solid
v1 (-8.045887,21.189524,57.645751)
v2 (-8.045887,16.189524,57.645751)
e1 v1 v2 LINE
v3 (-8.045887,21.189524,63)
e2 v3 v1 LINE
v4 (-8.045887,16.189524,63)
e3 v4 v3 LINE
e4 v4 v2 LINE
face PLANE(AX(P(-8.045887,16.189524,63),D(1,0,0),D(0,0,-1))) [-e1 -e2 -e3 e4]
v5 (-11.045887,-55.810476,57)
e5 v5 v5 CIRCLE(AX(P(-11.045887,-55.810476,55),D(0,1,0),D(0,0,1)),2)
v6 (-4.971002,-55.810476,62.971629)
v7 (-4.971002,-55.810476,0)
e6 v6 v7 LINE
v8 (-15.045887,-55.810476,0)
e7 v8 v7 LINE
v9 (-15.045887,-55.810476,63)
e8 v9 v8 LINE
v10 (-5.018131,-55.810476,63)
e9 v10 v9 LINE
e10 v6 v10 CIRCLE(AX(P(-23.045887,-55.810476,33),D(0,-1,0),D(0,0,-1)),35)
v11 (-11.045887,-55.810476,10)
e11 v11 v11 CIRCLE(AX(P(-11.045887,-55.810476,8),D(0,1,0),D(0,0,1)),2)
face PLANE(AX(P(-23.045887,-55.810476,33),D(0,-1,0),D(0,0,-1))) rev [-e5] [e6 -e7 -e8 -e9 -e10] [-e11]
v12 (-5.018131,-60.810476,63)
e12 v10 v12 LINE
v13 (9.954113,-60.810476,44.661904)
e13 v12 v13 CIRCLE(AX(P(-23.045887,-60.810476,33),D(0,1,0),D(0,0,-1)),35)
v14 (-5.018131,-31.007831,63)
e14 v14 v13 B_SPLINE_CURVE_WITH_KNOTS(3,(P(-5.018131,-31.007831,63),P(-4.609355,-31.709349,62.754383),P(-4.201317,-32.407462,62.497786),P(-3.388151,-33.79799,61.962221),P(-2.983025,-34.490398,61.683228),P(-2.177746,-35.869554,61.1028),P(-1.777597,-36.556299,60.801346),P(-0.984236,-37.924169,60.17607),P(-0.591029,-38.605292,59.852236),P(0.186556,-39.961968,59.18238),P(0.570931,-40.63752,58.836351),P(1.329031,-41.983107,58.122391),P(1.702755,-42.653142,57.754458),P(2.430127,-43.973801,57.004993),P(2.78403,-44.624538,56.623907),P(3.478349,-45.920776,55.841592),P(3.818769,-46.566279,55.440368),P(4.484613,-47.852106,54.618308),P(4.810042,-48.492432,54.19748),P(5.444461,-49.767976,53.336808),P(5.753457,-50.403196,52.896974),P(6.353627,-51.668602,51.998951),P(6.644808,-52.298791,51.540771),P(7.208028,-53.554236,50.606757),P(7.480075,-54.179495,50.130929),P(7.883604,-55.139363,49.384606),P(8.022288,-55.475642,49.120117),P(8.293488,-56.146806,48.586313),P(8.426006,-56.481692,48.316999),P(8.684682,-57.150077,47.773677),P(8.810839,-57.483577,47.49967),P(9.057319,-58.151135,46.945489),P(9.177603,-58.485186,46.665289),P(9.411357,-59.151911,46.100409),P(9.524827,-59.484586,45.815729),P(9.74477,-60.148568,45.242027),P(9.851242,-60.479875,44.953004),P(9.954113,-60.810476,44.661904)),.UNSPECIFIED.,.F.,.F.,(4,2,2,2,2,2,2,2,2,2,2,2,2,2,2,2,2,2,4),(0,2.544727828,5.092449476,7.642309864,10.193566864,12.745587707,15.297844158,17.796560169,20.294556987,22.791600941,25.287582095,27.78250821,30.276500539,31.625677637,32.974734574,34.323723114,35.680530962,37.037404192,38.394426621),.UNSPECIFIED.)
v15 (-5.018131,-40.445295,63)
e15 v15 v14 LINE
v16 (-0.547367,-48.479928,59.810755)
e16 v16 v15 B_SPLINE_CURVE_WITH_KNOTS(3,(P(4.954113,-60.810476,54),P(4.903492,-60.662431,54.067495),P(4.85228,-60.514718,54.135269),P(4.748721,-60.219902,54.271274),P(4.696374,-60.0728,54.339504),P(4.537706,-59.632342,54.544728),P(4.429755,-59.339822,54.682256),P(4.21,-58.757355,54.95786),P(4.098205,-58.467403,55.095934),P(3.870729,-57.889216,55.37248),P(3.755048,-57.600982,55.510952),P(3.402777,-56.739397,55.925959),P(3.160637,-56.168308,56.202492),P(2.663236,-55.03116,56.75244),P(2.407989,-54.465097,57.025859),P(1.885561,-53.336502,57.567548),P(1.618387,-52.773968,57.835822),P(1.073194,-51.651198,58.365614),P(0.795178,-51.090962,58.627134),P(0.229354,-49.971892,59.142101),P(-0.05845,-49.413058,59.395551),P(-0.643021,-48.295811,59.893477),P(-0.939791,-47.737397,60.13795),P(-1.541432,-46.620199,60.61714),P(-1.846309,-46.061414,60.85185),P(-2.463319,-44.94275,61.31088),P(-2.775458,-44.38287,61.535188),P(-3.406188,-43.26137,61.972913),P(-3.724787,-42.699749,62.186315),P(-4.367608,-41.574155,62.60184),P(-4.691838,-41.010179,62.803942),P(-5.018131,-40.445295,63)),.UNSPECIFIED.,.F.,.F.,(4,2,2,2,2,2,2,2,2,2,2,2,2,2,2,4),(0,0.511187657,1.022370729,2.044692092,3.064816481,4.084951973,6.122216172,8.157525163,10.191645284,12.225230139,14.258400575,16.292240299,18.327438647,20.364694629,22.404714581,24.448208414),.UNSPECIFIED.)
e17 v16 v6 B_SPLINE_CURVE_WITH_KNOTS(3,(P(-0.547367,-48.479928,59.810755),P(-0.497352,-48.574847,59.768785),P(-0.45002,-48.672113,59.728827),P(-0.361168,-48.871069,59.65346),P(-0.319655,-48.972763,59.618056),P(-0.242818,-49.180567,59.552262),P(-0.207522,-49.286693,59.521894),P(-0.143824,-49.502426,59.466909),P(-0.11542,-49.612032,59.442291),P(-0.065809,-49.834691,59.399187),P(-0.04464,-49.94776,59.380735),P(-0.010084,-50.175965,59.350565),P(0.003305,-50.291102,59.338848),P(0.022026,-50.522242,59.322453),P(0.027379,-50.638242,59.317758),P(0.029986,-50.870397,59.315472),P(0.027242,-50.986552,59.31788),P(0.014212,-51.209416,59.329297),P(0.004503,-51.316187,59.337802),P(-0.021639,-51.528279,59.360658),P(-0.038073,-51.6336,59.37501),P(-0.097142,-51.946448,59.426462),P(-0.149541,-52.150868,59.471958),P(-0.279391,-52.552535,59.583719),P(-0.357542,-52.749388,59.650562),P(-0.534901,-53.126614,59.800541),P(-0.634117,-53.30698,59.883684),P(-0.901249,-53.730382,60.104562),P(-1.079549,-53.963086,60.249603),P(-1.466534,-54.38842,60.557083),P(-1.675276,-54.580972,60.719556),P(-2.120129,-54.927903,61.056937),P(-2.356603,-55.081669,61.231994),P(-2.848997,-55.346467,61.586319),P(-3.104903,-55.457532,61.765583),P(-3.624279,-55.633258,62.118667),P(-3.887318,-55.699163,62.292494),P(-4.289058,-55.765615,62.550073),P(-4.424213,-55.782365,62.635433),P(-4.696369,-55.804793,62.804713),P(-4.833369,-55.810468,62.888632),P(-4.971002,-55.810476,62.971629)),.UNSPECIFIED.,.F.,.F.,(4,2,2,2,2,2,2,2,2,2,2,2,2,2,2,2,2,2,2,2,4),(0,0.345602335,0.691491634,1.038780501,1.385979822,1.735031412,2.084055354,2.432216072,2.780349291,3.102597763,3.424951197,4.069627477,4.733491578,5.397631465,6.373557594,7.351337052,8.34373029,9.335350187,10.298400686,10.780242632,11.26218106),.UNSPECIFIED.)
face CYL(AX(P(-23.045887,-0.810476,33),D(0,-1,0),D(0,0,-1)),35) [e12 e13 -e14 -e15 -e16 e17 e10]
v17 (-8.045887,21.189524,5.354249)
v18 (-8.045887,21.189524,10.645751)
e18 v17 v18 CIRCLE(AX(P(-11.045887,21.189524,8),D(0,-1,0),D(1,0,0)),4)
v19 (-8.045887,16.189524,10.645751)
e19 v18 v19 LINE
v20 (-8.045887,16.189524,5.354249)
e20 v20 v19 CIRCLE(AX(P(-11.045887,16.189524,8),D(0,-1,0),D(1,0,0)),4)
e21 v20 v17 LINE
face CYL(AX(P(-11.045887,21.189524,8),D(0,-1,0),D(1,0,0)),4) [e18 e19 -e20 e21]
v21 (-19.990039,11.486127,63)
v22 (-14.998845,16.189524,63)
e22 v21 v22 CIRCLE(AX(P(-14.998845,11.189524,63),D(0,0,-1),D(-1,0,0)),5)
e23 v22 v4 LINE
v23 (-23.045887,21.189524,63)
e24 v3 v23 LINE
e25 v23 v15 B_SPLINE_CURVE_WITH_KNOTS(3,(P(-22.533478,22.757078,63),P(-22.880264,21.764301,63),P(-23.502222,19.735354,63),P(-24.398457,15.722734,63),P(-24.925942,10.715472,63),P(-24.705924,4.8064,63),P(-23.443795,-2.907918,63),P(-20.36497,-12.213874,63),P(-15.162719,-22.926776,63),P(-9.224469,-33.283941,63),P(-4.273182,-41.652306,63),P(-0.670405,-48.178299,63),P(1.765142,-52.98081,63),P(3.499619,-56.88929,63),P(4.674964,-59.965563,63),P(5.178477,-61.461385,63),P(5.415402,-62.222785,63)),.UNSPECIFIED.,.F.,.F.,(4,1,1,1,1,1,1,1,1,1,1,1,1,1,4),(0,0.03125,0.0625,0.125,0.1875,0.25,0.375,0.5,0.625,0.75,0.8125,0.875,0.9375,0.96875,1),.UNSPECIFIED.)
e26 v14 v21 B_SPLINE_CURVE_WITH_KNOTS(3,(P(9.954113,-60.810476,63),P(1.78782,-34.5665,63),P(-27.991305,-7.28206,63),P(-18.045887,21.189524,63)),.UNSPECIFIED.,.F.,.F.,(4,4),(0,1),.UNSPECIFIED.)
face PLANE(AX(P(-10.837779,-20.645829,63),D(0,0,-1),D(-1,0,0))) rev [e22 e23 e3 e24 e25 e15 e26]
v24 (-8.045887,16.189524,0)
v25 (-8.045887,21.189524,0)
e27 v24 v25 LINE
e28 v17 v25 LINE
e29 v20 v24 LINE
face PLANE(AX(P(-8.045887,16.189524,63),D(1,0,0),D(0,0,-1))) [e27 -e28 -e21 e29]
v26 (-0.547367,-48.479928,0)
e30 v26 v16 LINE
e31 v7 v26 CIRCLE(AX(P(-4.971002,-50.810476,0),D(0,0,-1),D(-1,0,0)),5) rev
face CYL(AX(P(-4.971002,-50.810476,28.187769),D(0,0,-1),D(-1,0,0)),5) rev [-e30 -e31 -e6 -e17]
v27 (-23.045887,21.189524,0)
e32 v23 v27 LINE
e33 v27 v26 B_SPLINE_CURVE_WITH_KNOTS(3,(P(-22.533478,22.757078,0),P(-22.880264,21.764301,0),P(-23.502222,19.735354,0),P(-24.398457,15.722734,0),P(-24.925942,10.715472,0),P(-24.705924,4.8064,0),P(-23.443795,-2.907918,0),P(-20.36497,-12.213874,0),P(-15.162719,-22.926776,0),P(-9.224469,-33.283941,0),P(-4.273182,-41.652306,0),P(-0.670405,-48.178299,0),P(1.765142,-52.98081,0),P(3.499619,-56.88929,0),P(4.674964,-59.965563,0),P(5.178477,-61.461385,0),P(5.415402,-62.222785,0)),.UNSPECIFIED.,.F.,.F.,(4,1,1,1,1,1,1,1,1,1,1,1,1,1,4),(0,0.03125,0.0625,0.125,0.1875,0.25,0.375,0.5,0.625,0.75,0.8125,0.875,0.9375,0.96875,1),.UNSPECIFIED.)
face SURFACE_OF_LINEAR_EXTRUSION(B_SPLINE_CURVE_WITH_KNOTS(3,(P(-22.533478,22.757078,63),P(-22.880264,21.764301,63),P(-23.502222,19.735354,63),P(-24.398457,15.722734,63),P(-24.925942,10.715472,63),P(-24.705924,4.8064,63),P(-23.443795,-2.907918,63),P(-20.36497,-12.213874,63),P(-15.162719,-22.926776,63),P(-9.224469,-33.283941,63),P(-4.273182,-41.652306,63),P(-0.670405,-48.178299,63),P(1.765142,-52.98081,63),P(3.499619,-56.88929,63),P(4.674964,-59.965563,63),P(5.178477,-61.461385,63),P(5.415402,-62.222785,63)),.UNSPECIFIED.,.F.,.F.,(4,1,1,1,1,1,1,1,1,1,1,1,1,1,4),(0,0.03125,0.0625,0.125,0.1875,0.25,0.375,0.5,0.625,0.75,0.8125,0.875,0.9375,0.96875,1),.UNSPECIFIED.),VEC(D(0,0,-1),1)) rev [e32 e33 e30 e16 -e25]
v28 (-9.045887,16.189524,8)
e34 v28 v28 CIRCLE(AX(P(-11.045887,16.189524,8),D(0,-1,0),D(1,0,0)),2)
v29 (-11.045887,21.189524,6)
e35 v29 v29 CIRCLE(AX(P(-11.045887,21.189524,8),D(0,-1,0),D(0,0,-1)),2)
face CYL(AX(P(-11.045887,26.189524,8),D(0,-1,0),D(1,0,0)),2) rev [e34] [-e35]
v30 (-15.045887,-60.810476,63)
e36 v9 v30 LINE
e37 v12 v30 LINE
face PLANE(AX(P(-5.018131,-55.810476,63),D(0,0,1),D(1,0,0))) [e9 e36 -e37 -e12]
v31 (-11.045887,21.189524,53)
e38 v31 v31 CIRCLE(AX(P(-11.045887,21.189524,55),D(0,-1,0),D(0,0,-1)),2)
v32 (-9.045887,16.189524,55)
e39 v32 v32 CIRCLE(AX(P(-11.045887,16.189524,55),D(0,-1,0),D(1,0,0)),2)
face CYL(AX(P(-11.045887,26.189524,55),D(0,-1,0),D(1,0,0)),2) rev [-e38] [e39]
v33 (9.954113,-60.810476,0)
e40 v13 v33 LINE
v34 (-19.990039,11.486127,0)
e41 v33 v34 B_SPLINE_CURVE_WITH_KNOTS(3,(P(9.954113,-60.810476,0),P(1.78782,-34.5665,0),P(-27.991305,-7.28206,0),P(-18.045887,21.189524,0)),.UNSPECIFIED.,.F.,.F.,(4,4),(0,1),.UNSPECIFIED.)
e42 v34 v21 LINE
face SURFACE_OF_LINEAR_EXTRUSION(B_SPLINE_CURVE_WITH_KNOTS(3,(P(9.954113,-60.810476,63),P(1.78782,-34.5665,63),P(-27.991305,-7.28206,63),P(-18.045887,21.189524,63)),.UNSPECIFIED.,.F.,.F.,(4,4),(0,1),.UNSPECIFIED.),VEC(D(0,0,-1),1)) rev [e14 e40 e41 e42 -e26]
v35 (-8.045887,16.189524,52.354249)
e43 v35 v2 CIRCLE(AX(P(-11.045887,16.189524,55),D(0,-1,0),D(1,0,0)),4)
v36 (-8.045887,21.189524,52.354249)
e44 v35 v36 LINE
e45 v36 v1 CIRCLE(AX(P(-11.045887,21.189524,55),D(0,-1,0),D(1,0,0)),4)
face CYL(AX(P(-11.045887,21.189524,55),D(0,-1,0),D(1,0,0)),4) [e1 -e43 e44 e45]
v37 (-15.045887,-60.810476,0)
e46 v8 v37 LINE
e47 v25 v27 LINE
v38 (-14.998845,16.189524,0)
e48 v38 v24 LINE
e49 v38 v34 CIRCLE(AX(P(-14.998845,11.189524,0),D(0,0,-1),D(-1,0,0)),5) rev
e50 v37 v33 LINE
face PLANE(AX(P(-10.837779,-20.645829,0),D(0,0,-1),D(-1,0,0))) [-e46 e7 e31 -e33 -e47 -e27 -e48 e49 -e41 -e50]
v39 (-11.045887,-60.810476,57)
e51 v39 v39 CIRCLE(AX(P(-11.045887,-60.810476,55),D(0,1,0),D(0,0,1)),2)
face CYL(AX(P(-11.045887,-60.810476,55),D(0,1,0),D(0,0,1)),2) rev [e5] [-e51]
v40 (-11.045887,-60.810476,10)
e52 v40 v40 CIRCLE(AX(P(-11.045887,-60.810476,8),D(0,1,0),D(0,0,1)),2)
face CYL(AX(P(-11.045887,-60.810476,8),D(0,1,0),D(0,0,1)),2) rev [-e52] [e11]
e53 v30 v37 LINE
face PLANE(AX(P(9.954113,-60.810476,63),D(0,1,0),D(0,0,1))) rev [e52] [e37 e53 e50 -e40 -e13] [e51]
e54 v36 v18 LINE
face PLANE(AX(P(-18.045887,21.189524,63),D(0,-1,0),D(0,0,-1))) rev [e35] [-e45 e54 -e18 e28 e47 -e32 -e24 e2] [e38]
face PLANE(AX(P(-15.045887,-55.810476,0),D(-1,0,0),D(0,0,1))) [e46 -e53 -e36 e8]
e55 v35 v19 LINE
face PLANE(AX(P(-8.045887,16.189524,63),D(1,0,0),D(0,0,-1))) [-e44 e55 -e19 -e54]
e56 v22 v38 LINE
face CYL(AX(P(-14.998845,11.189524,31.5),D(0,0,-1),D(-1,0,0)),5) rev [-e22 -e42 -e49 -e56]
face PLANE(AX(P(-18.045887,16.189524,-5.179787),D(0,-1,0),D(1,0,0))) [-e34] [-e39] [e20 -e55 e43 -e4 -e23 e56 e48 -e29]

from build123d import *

# Parameters (mm, degrees)
BOSS_EXTRUDE1_DEPTH = 63
CUT_EXTRUDE4_DEPTH  = 60
BOSS_EXTRUDE5_DEPTH = 5
FILLET3_R           = 5
BOSS_EXTRUDE6_DEPTH = 5
BOSS_EXTRUDE7_DEPTH = 63
FILLET4_R           = 5
SKETCH14_R          = 1.9999999999999996
SKETCH14_R_2        = 2
CUT_EXTRUDE5_DEPTH  = 10
SKETCH15_R          = 4.000000000000002
SKETCH15_R_2        = 2
SKETCH15_R_3        = 4.000000000000001
SKETCH15_R_4        = 1.9999999999999996
BOSS_EXTRUDE8_DEPTH = 5
CUT_EXTRUDE6_START  = -5
SKETCH16_R          = 2
SKETCH16_R_2        = 1.9999999999999996
CUT_EXTRUDE6_DEPTH  = 5


# Read off the part's stored shape, not the designer's step: Boss-Extrude1
with BuildPart() as part:
    # Boss-Extrude1 outline → Boss-Extrude1 (new body)
    with BuildSketch(Plane.XY):
        with BuildLine():
            Line((4.954113003, -60.810475982), (9.954113003, -60.810475982))
            add(Edge.make_bspline(
                [(9.954113003, -60.810475982), (1.78782004145555, -34.5665002552168), (-27.9913048539535, -7.28206006884536), (-18.045886997, 21.189524018)],
                knots=[0, 0, 0, 0, 1, 1, 1, 1], degree=3))
            Line((-18.045886997, 21.189524018), (-23.045886997, 21.189524018))
            add(Edge.make_bspline(
                [(-23.045886997, 21.189524018), (-23.192896954450642, 20.707388183877445), (-23.619107908159766, 19.212032019757164), (-24.3984566732412, 15.7227335791878), (-24.9259424602794, 10.7154717202631), (-24.7059244457818, 4.80639957244901), (-23.4437954980132, -2.90791828688786), (-20.3649701079, -12.2138739410152), (-15.1627192062184, -22.9267758821705), (-9.22446854976525, -33.2839412268649), (-4.2731817504284, -41.6523064711653), (-0.670405229165687, -48.1782991582584), (1.76514247549924, -52.980809675903), (3.49961876568494, -56.8892897902748), (4.492016037450547, -59.4867262662843), (4.856824135774904, -60.5259563871115), (4.954113003, -60.810475982)],
                knots=[0.01630237867055594, 0.01630237867055594, 0.01630237867055594, 0.01630237867055594, 0.03125, 0.0625, 0.125, 0.1875, 0.25, 0.375, 0.5, 0.625, 0.75, 0.8125, 0.875, 0.9375, 0.96875, 0.9805431413660037, 0.9805431413660037, 0.9805431413660037, 0.9805431413660037], degree=3))
        make_face()
    extrude(amount=BOSS_EXTRUDE1_DEPTH)

    # Sketch10 → Cut-Extrude4 (cut)
    with BuildSketch(Plane.XZ.offset(60.81047598214444)):
        with BuildLine():
            Line((9.954113003304059, 63), (9.954113003304059, 44.66190378968828))
            ThreePointArc((9.954113003304059, 44.66190378968828), (4.065539070195477, 55.13527900478137), (-5.018130619372688, 63))
            Line((-5.018130619372688, 63), (4.954113003304057, 63))
            Line((4.954113003304057, 63), (9.954113003304059, 63))
        make_face()
    extrude(amount=-CUT_EXTRUDE4_DEPTH, mode=Mode.SUBTRACT)

    # Sketch11 → Boss-Extrude5 (add)
    with BuildSketch(Plane.XZ.offset(60.81047598214444)):
        with BuildLine():
            Line((-15.045886996695936, 6e-16), (4.954113003304057, 0))
            Line((4.954113003304057, 0), (4.954113003304058, 54.00000000000057))
            ThreePointArc((4.954113003304058, 54.00000000000057), (0.4038163976446967, 58.98290612532635), (-5.018130619372695, 63))
            Line((-5.018130619372695, 63), (-15.045886996695936, 63))
            Line((-15.045886996695936, 63), (-15.045886996695936, 6e-16))
        make_face()
    extrude(amount=-BOSS_EXTRUDE5_DEPTH)

    # Fillet3
    fillet3_edges = [part.edges().sort_by_distance(p)[0] for p in [
        (3.003762593217399, -55.81047598214444, 28.187768789799662),
    ]]
    fillet(fillet3_edges, radius=FILLET3_R)



with BuildPart() as body_2:
    # Sketch12 → Boss-Extrude6 (new body)
    with BuildSketch(Plane(origin=(0, 21.189524017855575, 0), x_dir=(1, 0, 0), z_dir=(0, 1, 0))):
        Polygon((-18.04588699669594, -63), (-18.04588699669594, 0), (-8.045886996695941, -3.31e-15), (-8.045886996695941, -63), align=None)
    extrude(amount=-BOSS_EXTRUDE6_DEPTH)


with BuildPart() as part_1:
    add(part.part)

    add(body_2.part)  # Boss-Extrude7 merges body 2
    # Sketch13 → Boss-Extrude7 (add)
    with BuildSketch(Plane.XY.offset(63)):
        with BuildLine():
            Line((-18.04588699669594, 16.189524017855575), (-18.04588699669594, 21.189524017855575))
            add(Edge.make_bspline(
                [(-19.398734896011995, 16.18952401785558), (-19.076313221090718, 17.852122543862073), (-18.62949534090365, 19.51877933077492), (-18.04588699669594, 21.189524017855575)],
                knots=[0.9413188714055053, 0.9413188714055053, 0.9413188714055053, 0.9413188714055053, 1, 1, 1, 1], degree=3))
            Line((-19.398734896011995, 16.18952401785558), (-18.04588699669594, 16.189524017855575))
        make_face()
    extrude(amount=-BOSS_EXTRUDE7_DEPTH)

    # Fillet4
    fillet4_edges = [part_1.edges().sort_by_distance(p)[0] for p in [
        (-19.398734896011995, 16.18952401785558, 31.5),
    ]]
    fillet(fillet4_edges, radius=FILLET4_R)

    # Sketch14 → Cut-Extrude5 (cut)
    with BuildSketch(Plane.XZ.offset(-16.18952401785553)):
        with Locations((-11.045886996695984, 8)):
            Circle(SKETCH14_R)
        with Locations((-11.045886996695984, 55)):
            Circle(SKETCH14_R_2)
    extrude(amount=-CUT_EXTRUDE5_DEPTH, mode=Mode.SUBTRACT)

    # Sketch15 → Boss-Extrude8 (add)
    # profile 1 of 2: a face of its own
    with BuildSketch(Plane.XZ.offset(-16.18952401785553)):
        with Locations((-11.045886996695982, 55)):
            Circle(SKETCH15_R)
        with Locations((-11.045886996695982, 55)):
            Circle(SKETCH15_R_2, mode=Mode.SUBTRACT)
    # profile 2 of 2: a face of its own
    with BuildSketch(Plane.XZ.offset(-16.18952401785553)):
        with Locations((-11.045886996695982, 8)):
            Circle(SKETCH15_R_3)
        with Locations((-11.045886996695982, 8)):
            Circle(SKETCH15_R_4, mode=Mode.SUBTRACT)
    extrude(amount=-BOSS_EXTRUDE8_DEPTH)

    # Sketch16 → Cut-Extrude6 (cut)
    with BuildSketch(Plane(origin=(0, -55.81047598214444, 0), x_dir=(1, 0, 0), z_dir=(0, 1, 0)).offset(CUT_EXTRUDE6_START)):
        with Locations((-11.045886996695936, -55)):
            Circle(SKETCH16_R)
        with Locations((-11.045886996695936, -8)):
            Circle(SKETCH16_R_2)
    extrude(amount=CUT_EXTRUDE6_DEPTH, mode=Mode.SUBTRACT)


solid = part_1.part
